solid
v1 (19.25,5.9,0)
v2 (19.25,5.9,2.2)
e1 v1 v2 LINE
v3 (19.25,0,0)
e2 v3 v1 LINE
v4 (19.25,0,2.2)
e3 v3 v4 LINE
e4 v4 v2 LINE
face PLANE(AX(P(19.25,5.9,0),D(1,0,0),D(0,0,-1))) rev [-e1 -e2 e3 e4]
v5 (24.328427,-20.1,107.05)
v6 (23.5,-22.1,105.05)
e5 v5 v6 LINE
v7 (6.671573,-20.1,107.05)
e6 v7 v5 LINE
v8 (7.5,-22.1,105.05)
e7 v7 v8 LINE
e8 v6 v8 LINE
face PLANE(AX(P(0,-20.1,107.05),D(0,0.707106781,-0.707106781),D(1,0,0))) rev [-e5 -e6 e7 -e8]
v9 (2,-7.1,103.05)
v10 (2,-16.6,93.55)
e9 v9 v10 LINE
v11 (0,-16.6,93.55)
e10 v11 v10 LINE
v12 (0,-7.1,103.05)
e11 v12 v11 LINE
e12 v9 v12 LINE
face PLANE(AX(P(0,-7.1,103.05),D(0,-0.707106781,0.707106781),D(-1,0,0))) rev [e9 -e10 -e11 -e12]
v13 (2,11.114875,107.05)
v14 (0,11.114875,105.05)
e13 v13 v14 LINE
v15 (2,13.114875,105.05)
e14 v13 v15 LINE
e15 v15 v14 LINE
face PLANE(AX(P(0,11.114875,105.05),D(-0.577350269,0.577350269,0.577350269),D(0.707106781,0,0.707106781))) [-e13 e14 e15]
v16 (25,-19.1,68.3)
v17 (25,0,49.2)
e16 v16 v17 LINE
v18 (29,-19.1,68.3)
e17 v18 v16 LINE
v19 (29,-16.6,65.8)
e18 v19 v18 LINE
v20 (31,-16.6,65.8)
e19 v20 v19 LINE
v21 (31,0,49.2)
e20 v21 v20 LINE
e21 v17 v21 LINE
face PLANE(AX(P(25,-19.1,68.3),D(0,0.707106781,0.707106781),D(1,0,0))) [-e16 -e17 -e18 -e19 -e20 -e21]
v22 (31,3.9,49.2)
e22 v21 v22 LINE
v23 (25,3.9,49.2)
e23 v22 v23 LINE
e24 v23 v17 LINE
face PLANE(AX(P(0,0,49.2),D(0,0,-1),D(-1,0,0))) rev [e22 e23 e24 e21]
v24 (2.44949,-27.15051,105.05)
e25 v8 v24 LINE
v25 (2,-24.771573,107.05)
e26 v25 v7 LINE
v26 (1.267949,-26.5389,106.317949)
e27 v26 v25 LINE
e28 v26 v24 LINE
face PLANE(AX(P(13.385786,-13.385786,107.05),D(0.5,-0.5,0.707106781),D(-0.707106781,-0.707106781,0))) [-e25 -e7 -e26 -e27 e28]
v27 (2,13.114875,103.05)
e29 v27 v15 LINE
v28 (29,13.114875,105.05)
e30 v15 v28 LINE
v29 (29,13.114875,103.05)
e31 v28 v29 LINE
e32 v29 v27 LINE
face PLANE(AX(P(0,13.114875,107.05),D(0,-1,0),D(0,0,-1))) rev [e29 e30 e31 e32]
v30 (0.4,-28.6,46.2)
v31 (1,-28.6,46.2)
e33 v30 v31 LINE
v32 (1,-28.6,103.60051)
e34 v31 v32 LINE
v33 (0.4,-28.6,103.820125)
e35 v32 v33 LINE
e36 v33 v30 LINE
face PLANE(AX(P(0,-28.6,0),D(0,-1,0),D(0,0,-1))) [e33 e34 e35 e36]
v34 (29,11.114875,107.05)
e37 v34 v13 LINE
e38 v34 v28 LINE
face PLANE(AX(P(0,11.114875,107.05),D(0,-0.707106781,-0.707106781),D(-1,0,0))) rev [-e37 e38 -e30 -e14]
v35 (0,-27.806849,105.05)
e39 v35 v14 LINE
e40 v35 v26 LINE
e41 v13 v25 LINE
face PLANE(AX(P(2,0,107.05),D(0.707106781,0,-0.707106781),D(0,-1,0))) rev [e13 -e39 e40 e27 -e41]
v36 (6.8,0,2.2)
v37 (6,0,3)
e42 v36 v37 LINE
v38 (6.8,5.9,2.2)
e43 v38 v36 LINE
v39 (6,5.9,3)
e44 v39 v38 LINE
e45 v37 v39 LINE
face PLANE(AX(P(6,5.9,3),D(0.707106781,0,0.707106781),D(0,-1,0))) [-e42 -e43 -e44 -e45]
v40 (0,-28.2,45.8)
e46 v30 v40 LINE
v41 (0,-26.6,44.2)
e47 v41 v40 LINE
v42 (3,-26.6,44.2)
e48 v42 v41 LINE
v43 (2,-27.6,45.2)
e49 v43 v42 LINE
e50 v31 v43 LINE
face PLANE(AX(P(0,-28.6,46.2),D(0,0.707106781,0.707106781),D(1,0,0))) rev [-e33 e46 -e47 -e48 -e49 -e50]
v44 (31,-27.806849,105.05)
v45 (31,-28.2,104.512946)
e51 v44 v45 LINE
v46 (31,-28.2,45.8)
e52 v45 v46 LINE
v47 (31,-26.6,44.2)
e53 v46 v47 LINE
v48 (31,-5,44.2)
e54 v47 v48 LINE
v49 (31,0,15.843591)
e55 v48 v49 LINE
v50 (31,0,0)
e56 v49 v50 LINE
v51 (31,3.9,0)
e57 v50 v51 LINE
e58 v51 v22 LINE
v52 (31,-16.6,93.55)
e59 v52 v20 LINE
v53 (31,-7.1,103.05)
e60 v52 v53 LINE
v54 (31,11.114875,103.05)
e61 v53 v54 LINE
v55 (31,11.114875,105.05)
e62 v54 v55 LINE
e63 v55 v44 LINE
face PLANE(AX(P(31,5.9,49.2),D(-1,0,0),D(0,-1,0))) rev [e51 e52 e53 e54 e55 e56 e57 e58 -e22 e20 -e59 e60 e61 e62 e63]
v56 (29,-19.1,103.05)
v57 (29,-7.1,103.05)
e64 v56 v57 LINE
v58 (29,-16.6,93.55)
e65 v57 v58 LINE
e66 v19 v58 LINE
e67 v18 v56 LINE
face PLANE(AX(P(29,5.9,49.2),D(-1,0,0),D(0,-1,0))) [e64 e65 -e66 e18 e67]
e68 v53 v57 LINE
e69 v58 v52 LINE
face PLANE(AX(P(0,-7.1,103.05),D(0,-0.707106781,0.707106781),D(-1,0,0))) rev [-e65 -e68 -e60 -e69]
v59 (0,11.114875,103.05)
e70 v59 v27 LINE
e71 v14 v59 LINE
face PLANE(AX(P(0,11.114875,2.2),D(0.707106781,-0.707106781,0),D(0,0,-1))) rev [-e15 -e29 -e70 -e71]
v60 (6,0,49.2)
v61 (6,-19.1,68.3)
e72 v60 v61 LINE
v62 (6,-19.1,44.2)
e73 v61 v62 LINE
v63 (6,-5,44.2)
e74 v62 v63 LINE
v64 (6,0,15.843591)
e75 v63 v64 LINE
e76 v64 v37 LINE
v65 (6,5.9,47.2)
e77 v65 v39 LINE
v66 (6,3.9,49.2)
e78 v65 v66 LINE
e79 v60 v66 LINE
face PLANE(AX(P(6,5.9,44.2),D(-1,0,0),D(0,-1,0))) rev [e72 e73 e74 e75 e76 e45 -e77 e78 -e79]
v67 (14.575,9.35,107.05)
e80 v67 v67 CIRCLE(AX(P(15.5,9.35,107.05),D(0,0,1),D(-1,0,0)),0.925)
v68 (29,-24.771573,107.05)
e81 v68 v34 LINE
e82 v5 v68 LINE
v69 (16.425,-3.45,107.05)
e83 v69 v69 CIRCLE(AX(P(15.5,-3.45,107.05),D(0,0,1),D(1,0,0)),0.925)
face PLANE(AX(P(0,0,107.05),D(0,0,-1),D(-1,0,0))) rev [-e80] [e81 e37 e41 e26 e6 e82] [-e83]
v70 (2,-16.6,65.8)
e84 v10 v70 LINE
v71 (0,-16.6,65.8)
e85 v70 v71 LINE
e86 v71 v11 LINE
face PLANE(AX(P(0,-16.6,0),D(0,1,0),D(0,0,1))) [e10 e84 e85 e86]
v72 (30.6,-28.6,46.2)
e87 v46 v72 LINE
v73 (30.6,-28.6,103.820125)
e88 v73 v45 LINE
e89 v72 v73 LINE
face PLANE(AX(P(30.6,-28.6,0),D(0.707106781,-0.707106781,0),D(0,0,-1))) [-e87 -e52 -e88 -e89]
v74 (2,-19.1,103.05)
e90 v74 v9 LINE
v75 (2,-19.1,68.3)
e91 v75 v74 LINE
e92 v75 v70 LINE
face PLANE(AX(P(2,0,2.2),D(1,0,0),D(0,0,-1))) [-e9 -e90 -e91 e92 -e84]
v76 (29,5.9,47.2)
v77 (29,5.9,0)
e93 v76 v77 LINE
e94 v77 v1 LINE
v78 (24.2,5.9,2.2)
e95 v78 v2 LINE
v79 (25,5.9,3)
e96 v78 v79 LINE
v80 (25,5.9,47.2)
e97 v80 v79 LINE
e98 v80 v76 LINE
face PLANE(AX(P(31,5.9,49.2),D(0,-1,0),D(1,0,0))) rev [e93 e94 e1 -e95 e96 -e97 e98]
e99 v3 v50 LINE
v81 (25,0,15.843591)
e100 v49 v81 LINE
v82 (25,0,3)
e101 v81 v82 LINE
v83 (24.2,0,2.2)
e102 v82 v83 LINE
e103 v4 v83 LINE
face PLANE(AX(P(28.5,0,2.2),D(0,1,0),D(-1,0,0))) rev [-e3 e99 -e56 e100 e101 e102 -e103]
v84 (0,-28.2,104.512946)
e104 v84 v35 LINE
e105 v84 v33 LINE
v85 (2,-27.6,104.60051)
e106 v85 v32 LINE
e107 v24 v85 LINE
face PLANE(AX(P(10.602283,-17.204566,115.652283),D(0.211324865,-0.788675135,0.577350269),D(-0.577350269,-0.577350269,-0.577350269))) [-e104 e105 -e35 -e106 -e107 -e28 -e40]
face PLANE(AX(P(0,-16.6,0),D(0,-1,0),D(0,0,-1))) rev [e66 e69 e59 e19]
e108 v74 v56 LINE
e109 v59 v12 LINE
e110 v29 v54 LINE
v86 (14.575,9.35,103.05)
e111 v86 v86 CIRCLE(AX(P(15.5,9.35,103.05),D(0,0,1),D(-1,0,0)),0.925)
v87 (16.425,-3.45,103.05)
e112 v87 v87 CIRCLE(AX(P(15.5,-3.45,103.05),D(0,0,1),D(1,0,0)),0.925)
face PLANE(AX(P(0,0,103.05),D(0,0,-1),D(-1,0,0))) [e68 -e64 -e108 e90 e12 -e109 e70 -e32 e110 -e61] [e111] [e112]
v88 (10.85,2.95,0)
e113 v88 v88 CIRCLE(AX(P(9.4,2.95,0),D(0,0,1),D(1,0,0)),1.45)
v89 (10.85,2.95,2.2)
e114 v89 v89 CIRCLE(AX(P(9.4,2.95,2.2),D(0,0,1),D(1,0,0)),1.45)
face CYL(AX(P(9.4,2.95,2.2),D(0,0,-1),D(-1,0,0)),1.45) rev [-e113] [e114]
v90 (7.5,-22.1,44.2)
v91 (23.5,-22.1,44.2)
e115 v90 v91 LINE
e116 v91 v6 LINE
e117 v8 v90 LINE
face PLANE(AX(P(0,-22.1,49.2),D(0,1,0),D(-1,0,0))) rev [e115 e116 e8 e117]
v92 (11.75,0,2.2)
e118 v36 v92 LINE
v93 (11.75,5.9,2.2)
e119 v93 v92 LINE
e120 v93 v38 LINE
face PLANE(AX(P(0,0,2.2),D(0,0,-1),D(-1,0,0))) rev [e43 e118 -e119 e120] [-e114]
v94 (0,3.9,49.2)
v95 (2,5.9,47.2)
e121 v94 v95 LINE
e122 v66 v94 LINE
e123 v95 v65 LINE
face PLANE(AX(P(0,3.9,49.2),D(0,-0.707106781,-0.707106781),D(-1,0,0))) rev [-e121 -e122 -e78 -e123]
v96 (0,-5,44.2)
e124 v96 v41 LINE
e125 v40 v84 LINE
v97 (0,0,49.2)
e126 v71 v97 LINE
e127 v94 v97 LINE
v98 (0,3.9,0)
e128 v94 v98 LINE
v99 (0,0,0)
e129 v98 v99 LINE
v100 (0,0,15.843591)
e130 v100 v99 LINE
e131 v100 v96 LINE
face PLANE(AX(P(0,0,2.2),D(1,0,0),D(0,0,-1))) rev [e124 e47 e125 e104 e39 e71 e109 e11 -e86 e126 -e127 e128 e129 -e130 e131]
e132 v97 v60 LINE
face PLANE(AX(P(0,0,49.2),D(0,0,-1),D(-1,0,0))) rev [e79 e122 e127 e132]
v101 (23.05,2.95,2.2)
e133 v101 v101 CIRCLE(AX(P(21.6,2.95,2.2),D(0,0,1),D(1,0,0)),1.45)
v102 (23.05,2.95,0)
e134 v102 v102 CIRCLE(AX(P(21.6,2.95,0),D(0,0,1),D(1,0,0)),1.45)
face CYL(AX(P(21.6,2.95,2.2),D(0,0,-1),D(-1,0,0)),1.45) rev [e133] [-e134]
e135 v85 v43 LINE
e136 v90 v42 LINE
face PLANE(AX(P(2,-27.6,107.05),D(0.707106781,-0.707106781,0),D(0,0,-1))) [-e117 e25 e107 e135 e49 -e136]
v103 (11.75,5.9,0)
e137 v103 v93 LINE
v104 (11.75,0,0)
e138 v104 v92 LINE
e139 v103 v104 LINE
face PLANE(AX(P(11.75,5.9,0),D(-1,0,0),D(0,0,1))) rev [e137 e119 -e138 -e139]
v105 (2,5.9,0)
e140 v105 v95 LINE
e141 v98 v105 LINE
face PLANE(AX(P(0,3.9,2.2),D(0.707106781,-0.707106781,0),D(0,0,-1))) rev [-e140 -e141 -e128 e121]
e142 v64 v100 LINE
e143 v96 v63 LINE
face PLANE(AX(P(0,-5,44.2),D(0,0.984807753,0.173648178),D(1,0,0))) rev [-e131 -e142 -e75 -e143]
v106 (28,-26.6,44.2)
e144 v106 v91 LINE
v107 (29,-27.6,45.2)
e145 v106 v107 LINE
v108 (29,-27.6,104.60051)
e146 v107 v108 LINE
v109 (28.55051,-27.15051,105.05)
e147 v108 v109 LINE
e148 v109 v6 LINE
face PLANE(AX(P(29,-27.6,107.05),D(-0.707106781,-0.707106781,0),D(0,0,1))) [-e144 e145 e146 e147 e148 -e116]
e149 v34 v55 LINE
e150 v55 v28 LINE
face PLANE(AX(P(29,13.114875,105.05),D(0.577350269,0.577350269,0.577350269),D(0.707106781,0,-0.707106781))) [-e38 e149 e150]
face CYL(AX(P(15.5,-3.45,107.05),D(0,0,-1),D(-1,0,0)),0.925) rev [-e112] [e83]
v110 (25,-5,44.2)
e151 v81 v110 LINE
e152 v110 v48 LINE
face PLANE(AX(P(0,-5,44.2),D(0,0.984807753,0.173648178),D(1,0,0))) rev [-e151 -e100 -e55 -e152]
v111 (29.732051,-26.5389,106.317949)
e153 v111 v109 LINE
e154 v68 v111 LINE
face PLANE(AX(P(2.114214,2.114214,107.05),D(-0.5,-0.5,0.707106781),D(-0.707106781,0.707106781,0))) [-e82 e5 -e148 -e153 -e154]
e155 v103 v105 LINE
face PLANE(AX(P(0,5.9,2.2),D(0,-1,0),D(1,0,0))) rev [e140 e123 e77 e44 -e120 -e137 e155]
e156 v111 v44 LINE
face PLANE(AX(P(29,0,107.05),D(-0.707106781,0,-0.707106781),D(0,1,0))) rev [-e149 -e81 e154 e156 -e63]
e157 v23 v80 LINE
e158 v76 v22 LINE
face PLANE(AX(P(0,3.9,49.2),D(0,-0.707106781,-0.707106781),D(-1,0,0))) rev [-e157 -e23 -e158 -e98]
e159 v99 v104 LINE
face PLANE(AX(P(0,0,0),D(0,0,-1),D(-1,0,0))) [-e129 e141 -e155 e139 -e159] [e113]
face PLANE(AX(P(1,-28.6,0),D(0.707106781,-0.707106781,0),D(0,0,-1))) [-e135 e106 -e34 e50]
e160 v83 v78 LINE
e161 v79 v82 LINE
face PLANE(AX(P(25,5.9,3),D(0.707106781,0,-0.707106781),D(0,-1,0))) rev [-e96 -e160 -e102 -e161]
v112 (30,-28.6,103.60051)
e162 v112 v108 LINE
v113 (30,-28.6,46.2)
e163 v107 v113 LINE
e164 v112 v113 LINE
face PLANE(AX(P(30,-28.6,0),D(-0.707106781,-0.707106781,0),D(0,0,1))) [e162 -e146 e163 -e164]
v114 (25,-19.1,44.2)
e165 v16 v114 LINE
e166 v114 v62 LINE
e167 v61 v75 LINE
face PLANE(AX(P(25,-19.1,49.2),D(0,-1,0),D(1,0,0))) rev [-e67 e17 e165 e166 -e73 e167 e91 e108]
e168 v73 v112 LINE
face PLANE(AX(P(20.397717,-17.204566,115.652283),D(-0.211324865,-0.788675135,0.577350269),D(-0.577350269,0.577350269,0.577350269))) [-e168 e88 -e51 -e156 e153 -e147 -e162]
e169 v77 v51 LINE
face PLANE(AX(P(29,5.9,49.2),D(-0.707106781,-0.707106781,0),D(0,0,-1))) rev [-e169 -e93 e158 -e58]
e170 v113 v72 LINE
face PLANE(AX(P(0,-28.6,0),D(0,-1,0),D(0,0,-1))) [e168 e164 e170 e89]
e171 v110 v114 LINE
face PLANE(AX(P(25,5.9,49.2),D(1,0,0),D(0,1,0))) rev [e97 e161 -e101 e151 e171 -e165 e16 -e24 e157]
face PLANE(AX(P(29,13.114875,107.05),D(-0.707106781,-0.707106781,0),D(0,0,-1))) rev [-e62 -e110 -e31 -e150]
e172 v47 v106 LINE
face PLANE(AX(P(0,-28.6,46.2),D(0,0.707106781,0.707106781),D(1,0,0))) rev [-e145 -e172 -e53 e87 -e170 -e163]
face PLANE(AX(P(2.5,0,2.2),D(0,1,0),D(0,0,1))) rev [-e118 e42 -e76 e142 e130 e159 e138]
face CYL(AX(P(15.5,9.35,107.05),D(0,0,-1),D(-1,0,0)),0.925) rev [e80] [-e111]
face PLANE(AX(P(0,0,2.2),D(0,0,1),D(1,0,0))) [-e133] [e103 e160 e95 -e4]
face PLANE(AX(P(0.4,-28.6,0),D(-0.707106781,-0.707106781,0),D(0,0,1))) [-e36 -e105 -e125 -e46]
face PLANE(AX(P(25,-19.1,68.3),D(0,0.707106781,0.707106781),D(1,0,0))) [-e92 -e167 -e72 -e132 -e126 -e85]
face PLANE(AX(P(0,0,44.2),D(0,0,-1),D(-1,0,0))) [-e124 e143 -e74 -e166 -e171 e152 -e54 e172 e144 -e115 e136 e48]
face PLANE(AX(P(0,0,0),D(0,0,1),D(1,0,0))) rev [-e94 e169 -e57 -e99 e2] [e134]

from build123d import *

# Parameters (mm, degrees)
SKETCH1_R             = 1.45
BOSS_EXTRUDE1_DEPTH   = 2.2
BOSS_EXTRUDE1_2_DEPTH = 2.2
SKETCH8_W             = 6
SKETCH8_H             = 5.9
BOSS_EXTRUDE6_DEPTH   = 42
BOSS_EXTRUDE7_DEPTH   = 5
SKETCH10_W            = 31
SKETCH10_H            = 3
BOSS_EXTRUDE8_DEPTH   = 53.85
SKETCH11_W            = 31
SKETCH11_H            = 35.214875224
SKETCH11_R            = 0.925
BOSS_EXTRUDE9_DEPTH   = 4
CHAMFER6_SIZE         = 19.1
CHAMFER7_SIZE         = 12
CHAMFER8_SIZE         = 2
CUT_EXTRUDE2_START    = 2
CUT_EXTRUDE2_DEPTH    = 27
CHAMFER10_SIZE        = 0.8
SKETCH14_W            = 7.5
SKETCH14_H            = 5.9
CUT_EXTRUDE3_DEPTH    = 112.547893301
CHAMFER11_SIZE        = 5
CHAMFER11_SIZE2       = 28.356409098
SKETCH15_W            = 2
SKETCH15_H            = 27.75
BOSS_EXTRUDE10_DEPTH  = 2.5
BOSS_EXTRUDE11_DEPTH  = 6.5
CHAMFER12_SIZE        = 1
CHAMFER13_SIZE        = 5.5
CHAMFER14_SIZE        = 1.464101615
CHAMFER14_SIZE_2      = 2
CHAMFER15_SIZE        = 0.4


# Some blends are built 0.0001 mm under size
with BuildPart() as part:
    # Sketch1 → Boss-Extrude1 (new body)
    with BuildSketch(Plane.XY):
        Polygon((0, 0), (0, 5.9), (12.25, 5.9), (12.25, 0), (2.5, 0), align=None)
        with Locations((9.4, 2.95)):
            Circle(SKETCH1_R, mode=Mode.SUBTRACT)
    extrude(amount=BOSS_EXTRUDE1_DEPTH)



with BuildPart() as body_2:
    # Sketch1 → Boss-Extrude1 2 (new body)
    with BuildSketch(Plane.XY):
        Polygon((31, 0), (31, 5.9), (18.75, 5.9), (18.75, 0), (28.5, 0), align=None)
        with Locations((21.6, 2.95)):
            Circle(SKETCH1_R, mode=Mode.SUBTRACT)
    extrude(amount=BOSS_EXTRUDE1_2_DEPTH)


with BuildPart() as part_1:
    add(part.part)

    add(body_2.part)  # Boss-Extrude6 merges body 2
    # Sketch8 → Boss-Extrude6 (add)
    with BuildSketch(Plane.XY.offset(2.2)):
        with Locations((3, 2.95)):
            Rectangle(SKETCH8_W, SKETCH8_H)
        with Locations((28, 2.95)):
            Rectangle(SKETCH8_W, SKETCH8_H)
    extrude(amount=BOSS_EXTRUDE6_DEPTH)

    # Sketch9 → Boss-Extrude7 (add)
    with BuildSketch(Plane.XY.offset(44.2)):
        Polygon((0, 5.9), (0, -22.1), (31, -22.1), (31, 5.9), (25, 5.9), (25, -19.1), (6, -19.1), (6, 5.9), align=None)
    extrude(amount=BOSS_EXTRUDE7_DEPTH)

    # Sketch10 → Boss-Extrude8 (add)
    with BuildSketch(Plane.XY.offset(49.2)):
        with Locations((15.5, -20.6)):
            Rectangle(SKETCH10_W, SKETCH10_H)
    extrude(amount=BOSS_EXTRUDE8_DEPTH)

    # Sketch11 → Boss-Extrude9 (add)
    with BuildSketch(Plane.XY.offset(103.05)):
        with Locations((15.5, -4.492562388)):
            Rectangle(SKETCH11_W, SKETCH11_H)
        with Locations((15.5, -3.45)):
            Circle(SKETCH11_R, mode=Mode.SUBTRACT)
        with Locations(Location((15.5, 9.35, 0), (0, 0, 180))):
            Circle(SKETCH11_R, mode=Mode.SUBTRACT)
    extrude(amount=BOSS_EXTRUDE9_DEPTH)

    # Chamfer6
    chamfer6_edges = [part_1.edges().sort_by_distance(p)[0] for p in [
        (3, -19.1, 49.2),
        (28, -19.1, 49.2),
    ]]
    chamfer(chamfer6_edges, length=CHAMFER6_SIZE)

    # Chamfer7
    chamfer7_edges = [part_1.edges().sort_by_distance(p)[0] for p in [
        (15.5, -19.1, 103.05),
    ]]
    chamfer(chamfer7_edges, length=CHAMFER7_SIZE)

    # Chamfer8
    chamfer8_edges = [part_1.edges().sort_by_distance(p)[0] for p in [
        (0, -4.492562388, 107.05),
        (31, -4.492562388, 107.05),
        (15.5, 13.114875224, 107.05),
        (0, 13.114875224, 105.05),
        (31, 13.114875224, 105.05),
        (31, 5.9, 24.6),
        (3, 5.9, 49.2),
        (28, 5.9, 49.2),
        (0, 5.9, 24.6),
    ]]
    chamfer(chamfer8_edges, length=CHAMFER8_SIZE)

    # Sketch13 → Cut-Extrude2 (cut)
    with BuildSketch(Plane(origin=(0, 0, 0), x_dir=(0, 0, -1), z_dir=(1, 0, 0)).offset(CUT_EXTRUDE2_START)):
        Polygon((-103.05, -7.1), (-91.05, -19.1), (-103.05, -19.1), align=None)
    extrude(amount=CUT_EXTRUDE2_DEPTH, mode=Mode.SUBTRACT)

    # Chamfer10
    chamfer10_edges = [part_1.edges().sort_by_distance(p)[0] for p in [
        (6, 2.95, 2.2),
        (25, 2.95, 2.2),
    ]]
    chamfer(chamfer10_edges, length=CHAMFER10_SIZE)

    # Sketch14 → Cut-Extrude3 (cut, through all)
    with BuildSketch(Plane.XY.offset(2.2)):
        with Locations((15.5, 2.95)):
            Rectangle(SKETCH14_W, SKETCH14_H)
    extrude(amount=-CUT_EXTRUDE3_DEPTH, mode=Mode.SUBTRACT)

    # Chamfer11
    chamfer11_edges = [part_1.edges().sort_by_distance(p)[0] for p in [
        (3, 0, 44.2),
        (28, 0, 44.2),
    ]]
    chamfer11_side = [part_1.faces().sort_by_distance(p)[0] for p in [
        (3, -0.380711177, 44.2),
    ]]
    chamfer(chamfer11_edges, length=CHAMFER11_SIZE, length2=CHAMFER11_SIZE2, reference=chamfer11_side[0])

    # Sketch15 → Boss-Extrude10 (add)
    with BuildSketch(Plane(origin=(0, -19.1, 0), x_dir=(1, 0, 0), z_dir=(0, 1, 0))):
        with Locations((1, -79.675)):
            Rectangle(SKETCH15_W, SKETCH15_H)
        with Locations((30, -79.675)):
            Rectangle(SKETCH15_W, SKETCH15_H)
    extrude(amount=BOSS_EXTRUDE10_DEPTH)

    # Sketch16 → Boss-Extrude11 (add)
    with BuildSketch(Plane.XZ.offset(22.1)):
        Polygon((2, 107.05), (2, 44.2), (0, 44.2), (0, 105.05), align=None)
        Polygon((29, 107.05), (29, 44.2), (31, 44.2), (31, 105.05), align=None)
    extrude(amount=BOSS_EXTRUDE11_DEPTH)

    # Chamfer12
    chamfer12_edges = [part_1.edges().sort_by_distance(p)[0] for p in [
        (29, -28.6, 75.625),
        (2, -28.6, 75.625),
    ]]
    chamfer(chamfer12_edges, length=CHAMFER12_SIZE)

    # Chamfer13
    chamfer13_edges = [part_1.edges().sort_by_distance(p)[0] for p in [
        (29, -22.1, 75.625),
        (2, -22.1, 75.625),
    ]]
    chamfer(chamfer13_edges, length=CHAMFER13_SIZE - 0.0001)  # a hair under: the kernel refuses the full size

    # Chamfer14
    # the kernel refuses this chamfer: 2, 1.464101615 mm, written as the material it takes off along each edge
    with BuildSketch(Plane(origin=(32.969523731, -31.569523731, 103.080476269), x_dir=(0.44444688362373996, 0.8153930851078324, -0.37094620148409235), z_dir=(-0.5773502691896258, 0.5773502691896258, 0.5773502691896258)), Plane(origin=(4.969523731, -24.630476269, 110.019523731), x_dir=(-0.4444468836237367, 0.8153930851078325, -0.37094620148409596), z_dir=(-0.5773502691896257, -0.5773502691896258, -0.5773502691896257))) as chamfer14_piece_1:
        Polygon((CHAMFER14_SIZE * 0.998648499248, CHAMFER14_SIZE * 0.0519728307677), (CHAMFER14_SIZE_2 * 0.45431445783, CHAMFER14_SIZE_2 * 0.8908413851), (0, 0), align=None)
    extrude(amount=12.018782759, mode=Mode.SUBTRACT)
    with BuildSketch(Plane(origin=(19.86319104, -18.46309104, 107.05), x_dir=(0.7068394360706733, 0.7068394360706733, 0.027495876610589075), z_dir=(0.7071067811865476, -0.7071067811865476, 0))) as chamfer14_piece_2_section:
        Polygon((CHAMFER14_SIZE_2 * 0.999621916911, -CHAMFER14_SIZE_2 * 0.0274958766106), (-CHAMFER14_SIZE_2 * 0.0274958766106, -CHAMFER14_SIZE_2 * 0.999621916911), (0, 0), align=None)
    chamfer14_piece_2 = extrude(amount=18.064765124, mode=Mode.PRIVATE)
    chamfer14_piece_2 = split(chamfer14_piece_2, bisect_by=Plane(origin=(26.660831265, -22.1, 106.348363543), z_dir=(0, -1, 0)), keep=Keep.TOP, mode=Mode.PRIVATE)
    add(chamfer14_piece_2, mode=Mode.SUBTRACT)
    with BuildSketch(Plane(origin=(2.356534024, -22.1, 107.05), x_dir=(0, 0.9996219169112968, 0.0274958766105891), z_dir=(1, 0, 0))) as chamfer14_piece_3_section:
        Polygon((CHAMFER14_SIZE_2 * 0.999621916911, -CHAMFER14_SIZE_2 * 0.0274958766106), (-CHAMFER14_SIZE_2 * 0.0274958766106, -CHAMFER14_SIZE_2 * 0.999621916911), (0, 0), align=None)
    chamfer14_piece_3 = extrude(amount=26.286931952, mode=Mode.PRIVATE)
    chamfer14_piece_3 = split(chamfer14_piece_3, bisect_by=Plane(origin=(19.18755831, -17.78745831, 106.371913367), z_dir=(-0.7071067811865476, -0.7071067811865476, 0)), keep=Keep.TOP, mode=Mode.PRIVATE)
    chamfer14_piece_3 = split(chamfer14_piece_3, bisect_by=Plane(origin=(11.81244169, -17.78745831, 106.371913367), z_dir=(0.7071067811865476, -0.7071067811865476, 0)), keep=Keep.TOP, mode=Mode.PRIVATE)
    add(chamfer14_piece_3, mode=Mode.SUBTRACT)
    with BuildSketch(Plane(origin=(-1.63690896, -31.23680896, 107.05), x_dir=(-0.7068394360706735, 0.7068394360706735, 0.02749587661058907), z_dir=(0.7071067811865476, 0.7071067811865476, 0))) as chamfer14_piece_4_section:
        Polygon((CHAMFER14_SIZE_2 * 0.999621916911, -CHAMFER14_SIZE_2 * 0.0274958766106), (-CHAMFER14_SIZE_2 * 0.0274958766106, -CHAMFER14_SIZE_2 * 0.999621916911), (0, 0), align=None)
    chamfer14_piece_4 = extrude(amount=18.064765124, mode=Mode.PRIVATE)
    chamfer14_piece_4 = split(chamfer14_piece_4, bisect_by=Plane(origin=(-0.06712973, -22.1, 106.41381375), z_dir=(0, -1, 0)), keep=Keep.TOP, mode=Mode.PRIVATE)
    add(chamfer14_piece_4, mode=Mode.SUBTRACT)
    with BuildSketch(Plane(origin=(6.143365976, -28.6, 44.2), x_dir=(0, 0.9996219169112968, -0.027495876610585647), z_dir=(-1, 0, 0))) as chamfer14_piece_5:
        Polygon((CHAMFER14_SIZE_2 * 0.999621916911, -CHAMFER14_SIZE_2 * 0.0274958766106), (-CHAMFER14_SIZE_2 * 0.0274958766106, -CHAMFER14_SIZE_2 * 0.999621916911), (0, 0), align=None)
    extrude(amount=11.286731952, mode=Mode.SUBTRACT)
    with BuildSketch(Plane(origin=(24.856634024, -28.6, 44.2), x_dir=(0, 0.9996219169112968, -0.027495876610585647), z_dir=(1, 0, 0))) as chamfer14_piece_6:
        Polygon((CHAMFER14_SIZE_2 * 0.999621916911, CHAMFER14_SIZE_2 * 0.0274958766106), (-CHAMFER14_SIZE_2 * 0.0274958766106, CHAMFER14_SIZE_2 * 0.999621916911), (0, 0), align=None)
    extrude(amount=11.286731952, mode=Mode.SUBTRACT)
    with BuildSketch(Plane(origin=(2.356534024, -22.1, 107.05), x_dir=(0, 0.9996219169112968, 0.0274958766105891), z_dir=(1, 0, 0))) as chamfer14_piece_7a_section:
        Polygon((CHAMFER14_SIZE_2 * 0.999621916911, -CHAMFER14_SIZE_2 * 0.0274958766106), (-CHAMFER14_SIZE_2 * 0.0274958766106, -CHAMFER14_SIZE_2 * 0.999621916911), (0, 0), align=None)
    chamfer14_piece_7a = extrude(amount=26.286931952, mode=Mode.PRIVATE)
    chamfer14_piece_7a = split(chamfer14_piece_7a, bisect_by=Plane(origin=(24.258421627, -22.858321627, 106.41381375), z_dir=(0.7071067811865476, 0.7071067811865476, 0)), keep=Keep.TOP, mode=Mode.PRIVATE)
    with BuildSketch(Plane(origin=(19.86319104, -18.46309104, 107.05), x_dir=(0.7068394360706733, 0.7068394360706733, 0.027495876610589075), z_dir=(0.7071067811865476, -0.7071067811865476, 0))) as chamfer14_piece_7b_section:
        Polygon((CHAMFER14_SIZE_2 * 0.999621916911, -CHAMFER14_SIZE_2 * 0.0274958766106), (-CHAMFER14_SIZE_2 * 0.0274958766106, -CHAMFER14_SIZE_2 * 0.999621916911), (0, 0), align=None)
    chamfer14_piece_7b = extrude(amount=18.064765124, mode=Mode.PRIVATE)
    chamfer14_piece_7b = split(chamfer14_piece_7b, bisect_by=Plane(origin=(22.427671271, -22.1, 106.41381375), z_dir=(0, 1, 0)), keep=Keep.TOP, mode=Mode.PRIVATE)
    chamfer14_piece_7 = chamfer14_piece_7a & chamfer14_piece_7b
    add(chamfer14_piece_7, mode=Mode.SUBTRACT)
    with BuildSketch(Plane(origin=(2.356534024, -22.1, 107.05), x_dir=(0, 0.9996219169112968, 0.0274958766105891), z_dir=(1, 0, 0))) as chamfer14_piece_8a_section:
        Polygon((CHAMFER14_SIZE_2 * 0.999621916911, -CHAMFER14_SIZE_2 * 0.0274958766106), (-CHAMFER14_SIZE_2 * 0.0274958766106, -CHAMFER14_SIZE_2 * 0.999621916911), (0, 0), align=None)
    chamfer14_piece_8a = extrude(amount=26.286931952, mode=Mode.PRIVATE)
    chamfer14_piece_8a = split(chamfer14_piece_8a, bisect_by=Plane(origin=(6.741578373, -22.858321627, 106.41381375), z_dir=(-0.7071067811865476, 0.7071067811865476, 0)), keep=Keep.TOP, mode=Mode.PRIVATE)
    with BuildSketch(Plane(origin=(-1.63690896, -31.23680896, 107.05), x_dir=(-0.7068394360706735, 0.7068394360706735, 0.02749587661058907), z_dir=(0.7071067811865476, 0.7071067811865476, 0))) as chamfer14_piece_8b_section:
        Polygon((CHAMFER14_SIZE_2 * 0.999621916911, -CHAMFER14_SIZE_2 * 0.0274958766106), (-CHAMFER14_SIZE_2 * 0.0274958766106, -CHAMFER14_SIZE_2 * 0.999621916911), (0, 0), align=None)
    chamfer14_piece_8b = extrude(amount=18.064765124, mode=Mode.PRIVATE)
    chamfer14_piece_8b = split(chamfer14_piece_8b, bisect_by=Plane(origin=(8.572328729, -22.1, 106.41381375), z_dir=(0, 1, 0)), keep=Keep.TOP, mode=Mode.PRIVATE)
    chamfer14_piece_8 = chamfer14_piece_8a & chamfer14_piece_8b
    add(chamfer14_piece_8, mode=Mode.SUBTRACT)

    # Chamfer15
    chamfer15_edges = [part_1.edges().sort_by_distance(p)[0] for p in [
        (0, -28.6, 75.083267831),
        (31, -28.6, 75.083267831),
    ]]
    chamfer(chamfer15_edges, length=CHAMFER15_SIZE)


solid = part_1.part
